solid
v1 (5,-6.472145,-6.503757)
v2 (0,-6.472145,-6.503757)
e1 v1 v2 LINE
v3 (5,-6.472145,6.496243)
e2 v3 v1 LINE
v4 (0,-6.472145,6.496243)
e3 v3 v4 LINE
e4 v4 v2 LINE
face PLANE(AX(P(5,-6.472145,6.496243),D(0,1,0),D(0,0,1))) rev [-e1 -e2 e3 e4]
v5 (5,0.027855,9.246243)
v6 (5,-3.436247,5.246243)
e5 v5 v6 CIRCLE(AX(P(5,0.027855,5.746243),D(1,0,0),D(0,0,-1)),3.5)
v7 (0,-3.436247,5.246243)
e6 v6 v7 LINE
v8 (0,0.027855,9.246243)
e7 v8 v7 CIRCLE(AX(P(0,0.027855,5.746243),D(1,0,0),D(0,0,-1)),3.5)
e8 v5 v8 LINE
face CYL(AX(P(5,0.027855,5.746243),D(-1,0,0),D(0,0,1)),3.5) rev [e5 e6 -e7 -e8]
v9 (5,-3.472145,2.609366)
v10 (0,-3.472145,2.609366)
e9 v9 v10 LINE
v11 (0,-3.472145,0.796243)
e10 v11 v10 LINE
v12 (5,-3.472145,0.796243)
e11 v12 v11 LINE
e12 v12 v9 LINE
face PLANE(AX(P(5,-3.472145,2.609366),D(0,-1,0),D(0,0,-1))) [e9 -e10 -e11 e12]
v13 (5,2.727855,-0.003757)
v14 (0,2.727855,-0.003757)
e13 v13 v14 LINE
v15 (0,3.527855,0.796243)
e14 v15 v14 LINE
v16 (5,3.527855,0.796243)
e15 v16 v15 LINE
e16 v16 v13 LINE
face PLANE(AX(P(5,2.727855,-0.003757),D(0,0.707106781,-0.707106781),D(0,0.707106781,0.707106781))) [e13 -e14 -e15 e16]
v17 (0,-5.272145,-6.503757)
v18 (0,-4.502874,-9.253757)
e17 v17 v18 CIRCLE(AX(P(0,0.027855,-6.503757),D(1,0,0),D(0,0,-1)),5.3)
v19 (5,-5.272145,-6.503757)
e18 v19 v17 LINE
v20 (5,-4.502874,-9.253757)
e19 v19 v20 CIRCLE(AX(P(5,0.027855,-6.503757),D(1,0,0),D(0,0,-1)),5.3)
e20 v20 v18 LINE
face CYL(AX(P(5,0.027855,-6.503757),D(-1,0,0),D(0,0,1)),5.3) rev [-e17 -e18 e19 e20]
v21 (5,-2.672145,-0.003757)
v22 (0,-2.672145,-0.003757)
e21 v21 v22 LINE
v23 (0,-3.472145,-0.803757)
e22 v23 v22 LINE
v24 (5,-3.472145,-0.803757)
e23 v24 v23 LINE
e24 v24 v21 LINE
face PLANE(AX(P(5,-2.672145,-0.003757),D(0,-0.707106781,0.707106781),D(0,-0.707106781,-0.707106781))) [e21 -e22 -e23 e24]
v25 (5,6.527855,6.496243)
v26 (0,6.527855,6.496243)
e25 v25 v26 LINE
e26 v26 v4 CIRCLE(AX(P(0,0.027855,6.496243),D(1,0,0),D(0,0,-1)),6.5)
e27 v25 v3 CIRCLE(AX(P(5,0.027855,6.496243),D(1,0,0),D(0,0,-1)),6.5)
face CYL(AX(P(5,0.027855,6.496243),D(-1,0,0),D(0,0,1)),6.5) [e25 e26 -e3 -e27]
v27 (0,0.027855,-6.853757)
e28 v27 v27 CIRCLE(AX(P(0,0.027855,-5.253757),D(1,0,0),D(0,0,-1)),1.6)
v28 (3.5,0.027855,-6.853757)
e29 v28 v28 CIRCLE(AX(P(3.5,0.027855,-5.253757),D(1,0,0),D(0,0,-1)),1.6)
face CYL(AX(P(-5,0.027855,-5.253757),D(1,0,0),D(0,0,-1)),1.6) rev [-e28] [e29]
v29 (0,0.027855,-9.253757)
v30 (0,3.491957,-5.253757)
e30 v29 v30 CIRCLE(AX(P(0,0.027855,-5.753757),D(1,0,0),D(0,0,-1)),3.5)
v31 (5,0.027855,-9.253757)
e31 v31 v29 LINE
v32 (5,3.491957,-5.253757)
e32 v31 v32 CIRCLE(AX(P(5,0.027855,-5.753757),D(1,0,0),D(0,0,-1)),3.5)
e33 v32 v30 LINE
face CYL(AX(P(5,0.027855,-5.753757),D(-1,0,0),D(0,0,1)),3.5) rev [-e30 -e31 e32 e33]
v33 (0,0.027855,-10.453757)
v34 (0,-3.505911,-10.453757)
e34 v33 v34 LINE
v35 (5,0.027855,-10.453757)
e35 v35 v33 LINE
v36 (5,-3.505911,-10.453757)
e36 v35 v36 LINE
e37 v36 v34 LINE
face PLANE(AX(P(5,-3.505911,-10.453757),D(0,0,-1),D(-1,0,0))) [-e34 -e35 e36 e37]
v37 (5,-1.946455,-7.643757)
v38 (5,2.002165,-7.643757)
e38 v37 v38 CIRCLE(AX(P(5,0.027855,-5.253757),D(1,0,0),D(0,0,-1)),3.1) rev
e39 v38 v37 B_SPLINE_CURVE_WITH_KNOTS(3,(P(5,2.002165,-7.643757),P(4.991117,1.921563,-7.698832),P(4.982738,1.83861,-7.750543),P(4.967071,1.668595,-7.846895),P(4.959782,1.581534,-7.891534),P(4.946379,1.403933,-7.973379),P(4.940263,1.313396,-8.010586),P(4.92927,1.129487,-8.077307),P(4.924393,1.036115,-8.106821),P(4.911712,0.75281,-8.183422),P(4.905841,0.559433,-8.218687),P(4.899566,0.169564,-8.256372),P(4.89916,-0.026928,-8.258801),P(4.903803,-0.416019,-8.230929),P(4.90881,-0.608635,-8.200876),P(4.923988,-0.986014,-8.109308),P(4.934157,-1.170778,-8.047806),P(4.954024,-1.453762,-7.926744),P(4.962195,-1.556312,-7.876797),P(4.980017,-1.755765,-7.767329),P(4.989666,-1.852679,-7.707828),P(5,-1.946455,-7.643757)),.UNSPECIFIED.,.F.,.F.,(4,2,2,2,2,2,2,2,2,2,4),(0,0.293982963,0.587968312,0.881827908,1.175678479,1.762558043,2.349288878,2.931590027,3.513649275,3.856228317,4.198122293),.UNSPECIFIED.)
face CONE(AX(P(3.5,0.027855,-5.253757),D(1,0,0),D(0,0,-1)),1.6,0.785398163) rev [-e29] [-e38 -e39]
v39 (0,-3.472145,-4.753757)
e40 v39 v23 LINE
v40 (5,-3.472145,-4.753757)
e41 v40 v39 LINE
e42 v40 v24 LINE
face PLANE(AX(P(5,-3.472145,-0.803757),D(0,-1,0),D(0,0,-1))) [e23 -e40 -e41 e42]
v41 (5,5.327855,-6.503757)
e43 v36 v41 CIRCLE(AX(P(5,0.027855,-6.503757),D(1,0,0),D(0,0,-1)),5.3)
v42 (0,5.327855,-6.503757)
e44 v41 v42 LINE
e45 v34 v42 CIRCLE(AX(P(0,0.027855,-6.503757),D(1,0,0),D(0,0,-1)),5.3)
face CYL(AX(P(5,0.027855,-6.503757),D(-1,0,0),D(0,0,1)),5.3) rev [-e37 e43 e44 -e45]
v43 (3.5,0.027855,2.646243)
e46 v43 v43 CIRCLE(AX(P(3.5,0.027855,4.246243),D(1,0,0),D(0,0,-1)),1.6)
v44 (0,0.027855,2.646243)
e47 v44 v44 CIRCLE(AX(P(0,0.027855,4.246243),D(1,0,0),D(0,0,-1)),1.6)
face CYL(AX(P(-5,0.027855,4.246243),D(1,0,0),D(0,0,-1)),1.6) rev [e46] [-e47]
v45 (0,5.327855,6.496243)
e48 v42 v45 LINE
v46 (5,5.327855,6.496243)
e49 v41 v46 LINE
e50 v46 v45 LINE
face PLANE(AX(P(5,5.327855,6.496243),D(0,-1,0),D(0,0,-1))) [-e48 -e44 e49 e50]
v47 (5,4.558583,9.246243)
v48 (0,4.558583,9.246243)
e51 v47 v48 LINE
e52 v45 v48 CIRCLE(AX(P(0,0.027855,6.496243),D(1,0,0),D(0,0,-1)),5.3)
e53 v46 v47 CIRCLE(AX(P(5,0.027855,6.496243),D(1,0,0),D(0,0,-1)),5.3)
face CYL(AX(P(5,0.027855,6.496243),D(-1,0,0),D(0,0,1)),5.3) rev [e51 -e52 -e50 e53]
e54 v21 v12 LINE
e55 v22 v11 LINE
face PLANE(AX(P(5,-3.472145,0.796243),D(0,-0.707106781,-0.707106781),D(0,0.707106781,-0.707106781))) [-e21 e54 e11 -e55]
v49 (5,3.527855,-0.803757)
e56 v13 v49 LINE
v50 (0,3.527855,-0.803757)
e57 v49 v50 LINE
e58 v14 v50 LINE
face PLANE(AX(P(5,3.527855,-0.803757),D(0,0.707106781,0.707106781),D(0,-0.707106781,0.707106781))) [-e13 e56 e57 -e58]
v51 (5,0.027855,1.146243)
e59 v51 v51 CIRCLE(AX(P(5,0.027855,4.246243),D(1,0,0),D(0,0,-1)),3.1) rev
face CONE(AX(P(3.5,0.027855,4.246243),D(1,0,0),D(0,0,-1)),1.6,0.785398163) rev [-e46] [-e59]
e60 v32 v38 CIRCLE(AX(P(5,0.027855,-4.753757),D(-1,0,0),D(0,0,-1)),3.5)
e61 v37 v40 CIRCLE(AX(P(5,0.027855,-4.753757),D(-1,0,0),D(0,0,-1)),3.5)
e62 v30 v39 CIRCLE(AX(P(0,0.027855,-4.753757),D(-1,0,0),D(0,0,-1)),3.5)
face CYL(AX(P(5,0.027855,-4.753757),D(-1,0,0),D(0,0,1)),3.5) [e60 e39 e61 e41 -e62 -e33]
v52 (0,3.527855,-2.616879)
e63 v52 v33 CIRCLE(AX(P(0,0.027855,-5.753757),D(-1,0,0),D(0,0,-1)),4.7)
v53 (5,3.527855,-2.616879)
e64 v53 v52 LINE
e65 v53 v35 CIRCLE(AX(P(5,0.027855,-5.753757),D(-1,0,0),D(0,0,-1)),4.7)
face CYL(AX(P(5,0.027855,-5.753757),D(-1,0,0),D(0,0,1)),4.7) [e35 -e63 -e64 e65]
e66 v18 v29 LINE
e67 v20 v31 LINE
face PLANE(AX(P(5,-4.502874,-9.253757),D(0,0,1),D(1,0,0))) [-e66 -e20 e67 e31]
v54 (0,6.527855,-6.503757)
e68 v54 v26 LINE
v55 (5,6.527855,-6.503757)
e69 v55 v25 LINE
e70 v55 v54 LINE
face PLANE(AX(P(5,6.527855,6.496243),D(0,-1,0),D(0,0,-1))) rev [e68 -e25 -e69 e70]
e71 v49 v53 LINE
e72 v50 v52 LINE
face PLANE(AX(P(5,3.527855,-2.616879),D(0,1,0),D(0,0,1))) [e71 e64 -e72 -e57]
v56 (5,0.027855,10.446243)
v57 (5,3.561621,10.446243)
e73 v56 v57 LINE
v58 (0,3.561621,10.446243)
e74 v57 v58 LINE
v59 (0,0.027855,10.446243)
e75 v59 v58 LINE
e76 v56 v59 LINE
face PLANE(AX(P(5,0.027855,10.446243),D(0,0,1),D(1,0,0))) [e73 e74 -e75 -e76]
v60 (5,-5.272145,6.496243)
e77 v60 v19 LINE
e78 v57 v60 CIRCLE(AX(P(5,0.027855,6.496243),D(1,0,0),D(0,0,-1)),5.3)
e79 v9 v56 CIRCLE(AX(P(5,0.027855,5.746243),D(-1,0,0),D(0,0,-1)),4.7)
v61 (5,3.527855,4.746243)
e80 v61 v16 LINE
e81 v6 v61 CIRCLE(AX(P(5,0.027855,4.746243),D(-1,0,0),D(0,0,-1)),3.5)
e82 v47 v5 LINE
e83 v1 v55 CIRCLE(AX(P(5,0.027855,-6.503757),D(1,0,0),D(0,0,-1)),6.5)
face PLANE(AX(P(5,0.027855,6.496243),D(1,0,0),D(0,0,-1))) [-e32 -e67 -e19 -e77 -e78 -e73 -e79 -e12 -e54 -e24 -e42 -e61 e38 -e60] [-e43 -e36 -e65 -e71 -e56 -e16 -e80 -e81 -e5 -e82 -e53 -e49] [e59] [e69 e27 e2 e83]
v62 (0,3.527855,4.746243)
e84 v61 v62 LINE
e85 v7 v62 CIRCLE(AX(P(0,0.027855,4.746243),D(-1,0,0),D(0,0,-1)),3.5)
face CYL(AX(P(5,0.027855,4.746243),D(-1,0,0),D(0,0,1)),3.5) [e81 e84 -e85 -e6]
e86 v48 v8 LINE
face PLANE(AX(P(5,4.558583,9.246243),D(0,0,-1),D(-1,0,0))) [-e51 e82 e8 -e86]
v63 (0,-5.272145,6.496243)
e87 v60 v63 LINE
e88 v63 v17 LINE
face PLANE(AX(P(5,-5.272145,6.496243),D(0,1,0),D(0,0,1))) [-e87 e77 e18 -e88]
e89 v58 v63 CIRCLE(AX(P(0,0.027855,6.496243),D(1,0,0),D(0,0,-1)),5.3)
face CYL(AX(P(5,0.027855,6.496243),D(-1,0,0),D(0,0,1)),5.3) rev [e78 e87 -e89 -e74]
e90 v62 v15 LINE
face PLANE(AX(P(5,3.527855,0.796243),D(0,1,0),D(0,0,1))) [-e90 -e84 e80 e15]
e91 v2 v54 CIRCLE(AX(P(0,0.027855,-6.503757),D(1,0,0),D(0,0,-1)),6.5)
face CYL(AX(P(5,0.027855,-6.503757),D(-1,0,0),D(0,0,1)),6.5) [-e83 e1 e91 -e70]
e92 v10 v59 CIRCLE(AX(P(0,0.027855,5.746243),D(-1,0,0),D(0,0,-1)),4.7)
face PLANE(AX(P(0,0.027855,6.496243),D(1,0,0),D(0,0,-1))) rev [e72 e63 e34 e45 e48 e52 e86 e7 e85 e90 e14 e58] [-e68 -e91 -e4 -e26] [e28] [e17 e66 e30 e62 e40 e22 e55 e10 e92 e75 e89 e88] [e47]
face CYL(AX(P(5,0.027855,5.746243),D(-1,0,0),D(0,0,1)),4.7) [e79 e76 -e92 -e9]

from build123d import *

# Parameters (mm, degrees)
BOSS_EXTRUDE2_DEPTH = 5
SKETCH4_R           = 1.6
CUT_EXTRUDE1_DEPTH  = 10
CHAMFER1_SIZE       = 1.5


with BuildPart() as part:
    # Sketch2 → Boss-Extrude2 (new body)
    with BuildSketch(Plane.YZ):
        with BuildLine():
            Line((-6.472145094, 6.496243265), (-6.472145094, -6.503756735))
            ThreePointArc((-6.472145094, -6.503756735), (0.027854906, -13.003756735), (6.527854906, -6.503756735))
            Line((6.527854906, -6.503756735), (6.527854906, 6.496243265))
            ThreePointArc((6.527854906, 6.496243265), (0.027854906, 12.996243265), (-6.472145094, 6.496243265))
        make_face()
        with BuildLine():
            Line((-5.272145094, 6.496243265), (-5.272145094, -6.503756735))
            ThreePointArc((-5.272145094, -6.503756735), (-5.076205272, -7.931541625), (-4.502873512, -9.253756735))
            Line((-4.502873512, -9.253756735), (0.027854906, -9.253756735))
            ThreePointArc((0.027854906, -9.253756735), (2.673606218, -8.045044583), (3.491956522, -5.253756735))
            ThreePointArc((3.491956522, -5.253756735), (-0.222788612, -8.244770603), (-3.472145094, -4.753756735))
            Line((-3.472145094, -4.753756735), (-3.472145094, -0.803756735))
            Line((-3.472145094, -0.803756735), (-2.672145094, -0.003756735))
            Line((-2.672145094, -0.003756735), (-3.472145094, 0.796243265))
            Line((-3.472145094, 0.796243265), (-3.472145094, 2.609365837))
            ThreePointArc((-3.472145094, 2.609365837), (-4.263608941, 7.662838695), (0.027854906, 10.446243265))
            Line((0.027854906, 10.446243265), (3.561620603, 10.446243265))
            ThreePointArc((3.561620603, 10.446243265), (-2.135596249, 11.334577596), (-5.272145094, 6.496243265))
        make_face(mode=Mode.SUBTRACT)
        with BuildLine():
            Line((4.558583325, 9.246243265), (0.027854906, 9.246243265))
            ThreePointArc((0.027854906, 9.246243265), (-2.617896405, 8.037531112), (-3.436246709, 5.246243265))
            ThreePointArc((-3.436246709, 5.246243265), (0.278498425, 8.237257133), (3.527854906, 4.746243265))
            Line((3.527854906, 4.746243265), (3.527854906, 0.796243265))
            Line((3.527854906, 0.796243265), (2.727854906, -0.003756735))
            Line((2.727854906, -0.003756735), (3.527854906, -0.803756735))
            Line((3.527854906, -0.803756735), (3.527854906, -2.616879307))
            ThreePointArc((3.527854906, -2.616879307), (4.319318754, -7.670352166), (0.027854906, -10.453756735))
            Line((0.027854906, -10.453756735), (-3.50591079, -10.453756735))
            ThreePointArc((-3.50591079, -10.453756735), (2.191306062, -11.342091066), (5.327854906, -6.503756735))
            Line((5.327854906, -6.503756735), (5.327854906, 6.496243265))
            ThreePointArc((5.327854906, 6.496243265), (5.131915085, 7.924028155), (4.558583325, 9.246243265))
        make_face(mode=Mode.SUBTRACT)
    extrude(amount=BOSS_EXTRUDE2_DEPTH)

    # Sketch4 → Cut-Extrude1 (cut)
    with BuildSketch(Plane.YZ.offset(5)):
        with Locations(Location((0.027854906, 4.246243265, 0), (0, 0, 270))):
            Circle(SKETCH4_R)
        with Locations(Location((0.027854906, -5.253756735, 0), (0, 0, 270))):
            Circle(SKETCH4_R)
    extrude(amount=-CUT_EXTRUDE1_DEPTH, mode=Mode.SUBTRACT)

    # Chamfer1
    # the kernel refuses this chamfer: 1.5 mm, written as the material it takes off along each edge
    with BuildSketch(Plane(origin=(5, 0.027854906, 4.246243265), x_dir=(0, 0, -1), z_dir=(0, -1, 0))) as chamfer1_piece_1:
        Polygon((1.6 + CHAMFER1_SIZE, 0), (1.6, -CHAMFER1_SIZE), (1.6, 0), align=None)
    revolve(axis=Axis((5, 0.027854906, 4.246243265), (1, 0, 0)), mode=Mode.SUBTRACT)
    with BuildSketch(Plane(origin=(5, 0.027854906, -5.253756735), x_dir=(0, 0, -1), z_dir=(0, -1, 0))) as chamfer1_piece_2:
        Polygon((1.6 + CHAMFER1_SIZE, 0), (1.6, -CHAMFER1_SIZE), (1.6, 0), align=None)
    revolve(axis=Axis((5, 0.027854906, -5.253756735), (1, 0, 0)), mode=Mode.SUBTRACT)


solid = part.part
